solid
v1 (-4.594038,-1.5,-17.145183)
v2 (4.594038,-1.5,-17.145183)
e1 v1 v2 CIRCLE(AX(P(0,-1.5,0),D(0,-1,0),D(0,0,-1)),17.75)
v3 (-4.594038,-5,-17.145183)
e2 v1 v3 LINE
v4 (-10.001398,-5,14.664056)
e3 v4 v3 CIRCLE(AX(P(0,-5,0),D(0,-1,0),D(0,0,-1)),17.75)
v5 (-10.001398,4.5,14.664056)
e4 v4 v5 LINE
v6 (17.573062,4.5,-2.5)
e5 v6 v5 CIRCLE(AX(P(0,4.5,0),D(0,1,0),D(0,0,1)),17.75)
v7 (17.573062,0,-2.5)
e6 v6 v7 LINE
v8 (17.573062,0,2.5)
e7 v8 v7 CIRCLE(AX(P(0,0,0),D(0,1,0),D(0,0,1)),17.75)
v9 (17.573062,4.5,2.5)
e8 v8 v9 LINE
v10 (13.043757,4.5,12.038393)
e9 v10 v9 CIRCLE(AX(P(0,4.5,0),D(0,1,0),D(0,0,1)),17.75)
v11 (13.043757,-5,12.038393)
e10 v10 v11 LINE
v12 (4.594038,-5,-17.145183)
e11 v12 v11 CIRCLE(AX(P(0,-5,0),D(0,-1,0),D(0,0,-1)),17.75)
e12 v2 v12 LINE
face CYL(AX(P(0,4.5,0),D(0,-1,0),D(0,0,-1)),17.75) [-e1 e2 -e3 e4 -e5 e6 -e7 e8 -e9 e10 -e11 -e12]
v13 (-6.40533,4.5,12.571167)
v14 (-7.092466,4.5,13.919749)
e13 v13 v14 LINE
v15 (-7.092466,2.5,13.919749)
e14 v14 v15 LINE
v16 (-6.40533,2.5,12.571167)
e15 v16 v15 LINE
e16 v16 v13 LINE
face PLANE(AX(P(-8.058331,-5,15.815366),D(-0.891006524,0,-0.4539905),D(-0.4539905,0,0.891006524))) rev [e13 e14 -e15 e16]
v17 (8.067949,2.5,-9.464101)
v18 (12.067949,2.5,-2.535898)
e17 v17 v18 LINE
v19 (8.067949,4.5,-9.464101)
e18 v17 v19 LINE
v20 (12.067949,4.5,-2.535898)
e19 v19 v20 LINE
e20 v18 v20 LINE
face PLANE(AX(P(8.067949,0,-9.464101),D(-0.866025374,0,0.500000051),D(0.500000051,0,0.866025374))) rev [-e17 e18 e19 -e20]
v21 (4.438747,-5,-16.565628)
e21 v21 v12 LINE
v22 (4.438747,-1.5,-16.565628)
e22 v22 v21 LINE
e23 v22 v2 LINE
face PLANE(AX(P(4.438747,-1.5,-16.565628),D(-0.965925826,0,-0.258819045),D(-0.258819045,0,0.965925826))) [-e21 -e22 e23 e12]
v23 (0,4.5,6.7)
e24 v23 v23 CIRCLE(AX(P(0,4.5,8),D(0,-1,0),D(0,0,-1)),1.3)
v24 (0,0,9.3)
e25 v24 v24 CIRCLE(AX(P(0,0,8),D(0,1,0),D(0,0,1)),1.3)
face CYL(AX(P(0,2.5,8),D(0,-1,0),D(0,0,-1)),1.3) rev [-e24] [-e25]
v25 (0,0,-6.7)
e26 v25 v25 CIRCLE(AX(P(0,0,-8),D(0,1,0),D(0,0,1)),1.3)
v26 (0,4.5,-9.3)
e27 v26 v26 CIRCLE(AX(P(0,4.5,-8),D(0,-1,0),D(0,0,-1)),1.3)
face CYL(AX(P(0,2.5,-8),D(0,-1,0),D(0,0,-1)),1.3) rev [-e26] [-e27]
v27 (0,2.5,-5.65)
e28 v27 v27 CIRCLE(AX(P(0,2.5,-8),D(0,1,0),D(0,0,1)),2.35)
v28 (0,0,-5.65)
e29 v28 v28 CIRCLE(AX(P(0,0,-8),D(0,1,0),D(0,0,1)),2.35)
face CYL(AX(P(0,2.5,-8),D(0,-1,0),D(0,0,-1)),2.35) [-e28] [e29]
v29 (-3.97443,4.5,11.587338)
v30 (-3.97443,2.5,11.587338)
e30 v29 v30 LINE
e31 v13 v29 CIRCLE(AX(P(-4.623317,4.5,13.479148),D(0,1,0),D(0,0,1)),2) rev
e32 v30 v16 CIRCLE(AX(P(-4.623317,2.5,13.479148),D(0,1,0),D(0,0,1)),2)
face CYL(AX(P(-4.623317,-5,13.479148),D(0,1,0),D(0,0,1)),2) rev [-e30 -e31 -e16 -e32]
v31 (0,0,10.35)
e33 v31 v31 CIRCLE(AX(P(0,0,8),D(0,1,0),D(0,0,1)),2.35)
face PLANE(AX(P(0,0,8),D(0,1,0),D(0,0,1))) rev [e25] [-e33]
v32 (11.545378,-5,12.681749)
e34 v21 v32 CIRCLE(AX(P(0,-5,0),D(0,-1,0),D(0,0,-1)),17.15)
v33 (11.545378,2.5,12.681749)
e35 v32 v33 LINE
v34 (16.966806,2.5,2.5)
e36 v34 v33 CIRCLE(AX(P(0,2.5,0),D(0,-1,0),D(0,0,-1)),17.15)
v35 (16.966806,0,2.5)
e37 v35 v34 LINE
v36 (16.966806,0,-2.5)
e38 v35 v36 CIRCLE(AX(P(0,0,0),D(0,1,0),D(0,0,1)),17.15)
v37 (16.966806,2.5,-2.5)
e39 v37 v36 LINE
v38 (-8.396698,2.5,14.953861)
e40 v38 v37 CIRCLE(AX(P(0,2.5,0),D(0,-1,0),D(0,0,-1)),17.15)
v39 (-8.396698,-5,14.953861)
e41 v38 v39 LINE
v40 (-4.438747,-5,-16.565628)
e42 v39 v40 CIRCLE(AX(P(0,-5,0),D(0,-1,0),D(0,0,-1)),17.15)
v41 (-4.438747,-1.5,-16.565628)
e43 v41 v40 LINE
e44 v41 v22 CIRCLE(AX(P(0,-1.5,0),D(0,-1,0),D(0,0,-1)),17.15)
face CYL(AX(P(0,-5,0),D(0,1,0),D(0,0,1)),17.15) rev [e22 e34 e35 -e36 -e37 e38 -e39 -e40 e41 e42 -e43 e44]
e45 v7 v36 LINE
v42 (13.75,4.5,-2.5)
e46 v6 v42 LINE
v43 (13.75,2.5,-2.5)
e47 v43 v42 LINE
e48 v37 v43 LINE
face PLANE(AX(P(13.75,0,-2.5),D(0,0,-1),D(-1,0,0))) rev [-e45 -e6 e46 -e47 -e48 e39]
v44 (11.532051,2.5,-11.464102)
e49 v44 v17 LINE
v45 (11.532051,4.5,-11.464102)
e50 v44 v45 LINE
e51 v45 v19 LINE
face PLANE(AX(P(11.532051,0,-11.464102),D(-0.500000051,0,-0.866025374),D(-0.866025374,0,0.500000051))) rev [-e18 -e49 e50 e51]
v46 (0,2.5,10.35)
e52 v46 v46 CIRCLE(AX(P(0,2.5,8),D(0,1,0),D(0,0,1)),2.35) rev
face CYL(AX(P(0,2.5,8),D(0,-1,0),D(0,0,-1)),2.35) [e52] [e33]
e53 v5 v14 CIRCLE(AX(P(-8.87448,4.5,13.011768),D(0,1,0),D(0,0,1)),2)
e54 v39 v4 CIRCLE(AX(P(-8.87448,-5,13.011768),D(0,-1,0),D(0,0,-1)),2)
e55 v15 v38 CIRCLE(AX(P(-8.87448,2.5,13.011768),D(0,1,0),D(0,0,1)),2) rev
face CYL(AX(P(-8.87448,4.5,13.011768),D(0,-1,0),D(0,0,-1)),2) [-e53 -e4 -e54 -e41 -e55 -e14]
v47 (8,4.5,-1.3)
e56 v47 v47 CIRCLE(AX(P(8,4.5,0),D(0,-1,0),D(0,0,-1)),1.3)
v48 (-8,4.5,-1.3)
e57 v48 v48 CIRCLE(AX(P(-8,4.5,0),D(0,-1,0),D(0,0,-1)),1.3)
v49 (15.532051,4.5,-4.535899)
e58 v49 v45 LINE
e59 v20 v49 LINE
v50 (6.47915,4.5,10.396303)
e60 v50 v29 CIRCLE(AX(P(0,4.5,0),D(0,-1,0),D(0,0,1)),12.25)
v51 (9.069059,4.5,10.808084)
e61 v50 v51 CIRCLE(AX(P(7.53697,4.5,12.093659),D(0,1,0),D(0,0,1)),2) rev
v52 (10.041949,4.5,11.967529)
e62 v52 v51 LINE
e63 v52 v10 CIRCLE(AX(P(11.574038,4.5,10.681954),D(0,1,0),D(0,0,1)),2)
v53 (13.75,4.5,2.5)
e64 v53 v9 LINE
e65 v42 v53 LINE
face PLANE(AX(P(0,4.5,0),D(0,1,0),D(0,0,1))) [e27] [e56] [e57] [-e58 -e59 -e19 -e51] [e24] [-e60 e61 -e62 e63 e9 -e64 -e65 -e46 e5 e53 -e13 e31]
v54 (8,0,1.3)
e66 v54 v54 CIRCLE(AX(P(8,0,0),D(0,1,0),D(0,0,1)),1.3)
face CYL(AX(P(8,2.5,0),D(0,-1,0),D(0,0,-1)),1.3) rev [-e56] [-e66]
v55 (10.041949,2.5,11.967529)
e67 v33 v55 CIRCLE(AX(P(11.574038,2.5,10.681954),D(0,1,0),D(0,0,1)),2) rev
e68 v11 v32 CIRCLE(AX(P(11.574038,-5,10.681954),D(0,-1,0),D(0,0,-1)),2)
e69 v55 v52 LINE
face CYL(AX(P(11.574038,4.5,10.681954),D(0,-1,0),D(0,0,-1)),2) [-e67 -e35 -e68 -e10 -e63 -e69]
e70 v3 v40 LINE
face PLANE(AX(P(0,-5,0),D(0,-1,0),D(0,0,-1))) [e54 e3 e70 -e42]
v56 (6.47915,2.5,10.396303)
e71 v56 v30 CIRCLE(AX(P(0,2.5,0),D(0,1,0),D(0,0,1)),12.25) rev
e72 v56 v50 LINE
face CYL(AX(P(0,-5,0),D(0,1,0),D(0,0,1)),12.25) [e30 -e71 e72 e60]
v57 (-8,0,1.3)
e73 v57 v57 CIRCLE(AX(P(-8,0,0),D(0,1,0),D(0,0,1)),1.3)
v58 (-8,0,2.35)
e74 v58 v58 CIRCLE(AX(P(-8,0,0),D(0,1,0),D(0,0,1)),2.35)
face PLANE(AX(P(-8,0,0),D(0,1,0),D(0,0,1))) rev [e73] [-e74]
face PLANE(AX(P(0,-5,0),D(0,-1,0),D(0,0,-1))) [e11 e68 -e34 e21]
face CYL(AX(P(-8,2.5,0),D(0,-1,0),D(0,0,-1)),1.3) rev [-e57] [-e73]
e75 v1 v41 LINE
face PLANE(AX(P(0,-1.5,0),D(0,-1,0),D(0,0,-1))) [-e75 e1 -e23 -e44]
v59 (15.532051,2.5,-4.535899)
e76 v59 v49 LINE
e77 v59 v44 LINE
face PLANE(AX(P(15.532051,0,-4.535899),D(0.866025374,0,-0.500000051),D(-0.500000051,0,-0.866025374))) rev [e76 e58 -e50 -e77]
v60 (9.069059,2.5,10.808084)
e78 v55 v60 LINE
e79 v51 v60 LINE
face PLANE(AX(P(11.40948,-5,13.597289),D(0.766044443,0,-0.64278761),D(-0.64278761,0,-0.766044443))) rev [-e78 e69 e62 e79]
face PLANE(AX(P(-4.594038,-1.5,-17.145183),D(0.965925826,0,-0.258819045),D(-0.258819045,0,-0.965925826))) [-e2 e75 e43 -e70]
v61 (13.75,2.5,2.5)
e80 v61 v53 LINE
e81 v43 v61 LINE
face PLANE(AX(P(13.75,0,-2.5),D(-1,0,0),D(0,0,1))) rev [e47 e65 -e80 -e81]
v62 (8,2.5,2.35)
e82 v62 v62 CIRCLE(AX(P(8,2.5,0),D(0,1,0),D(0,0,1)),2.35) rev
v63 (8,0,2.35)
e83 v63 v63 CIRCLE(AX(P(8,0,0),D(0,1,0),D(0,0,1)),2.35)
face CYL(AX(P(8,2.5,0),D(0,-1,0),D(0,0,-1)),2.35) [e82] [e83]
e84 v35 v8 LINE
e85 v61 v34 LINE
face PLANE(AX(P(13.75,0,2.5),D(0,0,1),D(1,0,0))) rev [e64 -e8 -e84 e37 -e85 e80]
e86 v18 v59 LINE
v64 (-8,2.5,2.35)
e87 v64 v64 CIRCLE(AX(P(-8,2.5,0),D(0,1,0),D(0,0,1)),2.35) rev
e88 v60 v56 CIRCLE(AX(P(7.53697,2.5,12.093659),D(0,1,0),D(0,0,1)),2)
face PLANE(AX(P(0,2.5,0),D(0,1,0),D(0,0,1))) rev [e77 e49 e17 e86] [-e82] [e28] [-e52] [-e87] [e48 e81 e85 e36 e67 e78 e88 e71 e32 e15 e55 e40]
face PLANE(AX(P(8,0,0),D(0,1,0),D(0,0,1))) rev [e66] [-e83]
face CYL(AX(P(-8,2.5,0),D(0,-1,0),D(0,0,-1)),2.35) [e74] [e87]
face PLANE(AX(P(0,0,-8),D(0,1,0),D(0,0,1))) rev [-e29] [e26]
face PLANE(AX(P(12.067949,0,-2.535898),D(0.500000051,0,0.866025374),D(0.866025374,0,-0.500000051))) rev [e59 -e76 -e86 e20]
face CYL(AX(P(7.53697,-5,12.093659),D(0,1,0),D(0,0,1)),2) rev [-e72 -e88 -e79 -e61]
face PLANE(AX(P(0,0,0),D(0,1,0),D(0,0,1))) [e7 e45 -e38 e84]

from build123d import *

# Parameters (mm, degrees)
SKETCH_1_R               = 2.35
SKETCH_1_R_2             = 1.3
EXTRUDE_1_DEPTH          = 2.5
EXTRUDE_1_2_DEPTH        = 2.5
EXTRUDE_1_3_DEPTH        = 2.5
EXTRUDE_1_4_DEPTH        = 2.5
SKETCH_2_R               = 17.75
EXTRUDE_2_DEPTH          = 2
SKETCH_3_R               = 1.3
CUT_EXTRUDE_1_DEPTH      = 26.226474189
CUT_EXTRUDE_2_DEPTH      = 26.502450863
CUT_EXTRUDE_2_DEPTH_BACK = 26.502450863
EXTRUDE_START            = 7.5
SKETCH_5_R               = 17.75
SKETCH_5_R_2             = 17.15
EXTRUDE_3_DEPTH          = 7.5
SKETCH_6_W               = 4
SKETCH_6_H               = 5
CUT_EXTRUDE_3_DEPTH      = 4.5
CUT_EXTRUDE_4_DEPTH      = 27.839802533
CUT_EXTRUDE_5_DEPTH      = 3.5
FILLET_1_R               = 2


with BuildPart() as part:
    # 草图1 → 凸台-拉伸1 (new body)
    with BuildSketch(Plane(origin=(0, 0, 0), x_dir=(1, 0, 0), z_dir=(0, 1, 0))):
        with Locations((0, 8)):
            Circle(SKETCH_1_R)
        with Locations((0, 8)):
            Circle(SKETCH_1_R_2, mode=Mode.SUBTRACT)
    extrude(amount=EXTRUDE_1_DEPTH)



with BuildPart() as body_2:
    # 草图1 → Extrude 1 2 (new body)
    with BuildSketch(Plane(origin=(0, 0, 0), x_dir=(1, 0, 0), z_dir=(0, 1, 0))):
        with Locations((8, 0)):
            Circle(SKETCH_1_R)
        with Locations((8, 0)):
            Circle(SKETCH_1_R_2, mode=Mode.SUBTRACT)
    extrude(amount=EXTRUDE_1_2_DEPTH)


with BuildPart() as body_3:
    # 草图1 → Extrude 1 3 (new body)
    with BuildSketch(Plane(origin=(0, 0, 0), x_dir=(1, 0, 0), z_dir=(0, 1, 0))):
        with Locations((0, -8)):
            Circle(SKETCH_1_R)
        with Locations((0, -8)):
            Circle(SKETCH_1_R_2, mode=Mode.SUBTRACT)
    extrude(amount=EXTRUDE_1_3_DEPTH)


with BuildPart() as body_4:
    # 草图1 → Extrude 1 4 (new body)
    with BuildSketch(Plane(origin=(0, 0, 0), x_dir=(1, 0, 0), z_dir=(0, 1, 0))):
        with Locations((-8, 0)):
            Circle(SKETCH_1_R)
        with Locations((-8, 0)):
            Circle(SKETCH_1_R_2, mode=Mode.SUBTRACT)
    extrude(amount=EXTRUDE_1_4_DEPTH)


with BuildPart() as part_1:
    add(part.part)

    add(body_2.part)  # 凸台-拉伸2 merges body 2

    add(body_3.part)  # 凸台-拉伸2 merges body 3

    add(body_4.part)  # 凸台-拉伸2 merges body 4
    # 草图2 → 凸台-拉伸2 (add)
    with BuildSketch(Plane(origin=(0, 2.5, 0), x_dir=(1, 0, 0), z_dir=(0, 1, 0))):
        Circle(SKETCH_2_R)
    extrude(amount=EXTRUDE_2_DEPTH)

    # 草图3 → 切除-拉伸1 (cut, through all)
    with BuildSketch(Plane.XZ.offset(-2.5)):
        with Locations((0, -8)):
            Circle(SKETCH_3_R)
        with Locations((8, 0)):
            Circle(SKETCH_3_R)
        with Locations((0, 8)):
            Circle(SKETCH_3_R)
        with Locations((-8, 0)):
            Circle(SKETCH_3_R)
    extrude(amount=-CUT_EXTRUDE_1_DEPTH, mode=Mode.SUBTRACT)

    # 草图4 → 切除-拉伸2 (cut, two sides: drawn at the far end of the back side and taken through both)
    with BuildSketch(Plane(origin=(0, 4.5, 0), x_dir=(1, 0, 0), z_dir=(0, 1, 0)).offset(-CUT_EXTRUDE_2_DEPTH_BACK)):
        Polygon((8.067949046, 9.464101393), (12.067949458, 2.535898401), (15.532050954, 4.535898607), (11.532050542, 11.464101599), align=None)
    extrude(amount=CUT_EXTRUDE_2_DEPTH + CUT_EXTRUDE_2_DEPTH_BACK, mode=Mode.SUBTRACT)

    # 草图5 → 凸台-拉伸3 (add)
    with BuildSketch(Plane.XZ.offset(-2.5).offset(EXTRUDE_START)):
        Circle(SKETCH_5_R)
        Circle(SKETCH_5_R_2, mode=Mode.SUBTRACT)
    extrude(amount=-EXTRUDE_3_DEPTH)

    # 草图6 → 切除-拉伸3 (cut)
    with BuildSketch(Plane(origin=(0, 4.5, 0), x_dir=(1, 0, 0), z_dir=(0, 1, 0))):
        with Locations((15.75, 0)):
            Rectangle(SKETCH_6_W, SKETCH_6_H)
    extrude(amount=-CUT_EXTRUDE_3_DEPTH, mode=Mode.SUBTRACT)

    # 草图7 → 切除-拉伸4 (cut, through all)
    with BuildSketch(Plane(origin=(0, 4.5, 0), x_dir=(1, 0, 0), z_dir=(0, 1, 0))):
        with BuildLine():
            Line((11.409480072, -13.597288865), (7.874148219, -9.384044428))
            ThreePointArc((7.874148219, -9.384044428), (1.386739369, -12.171255232), (-5.561383622, -10.914829921))
            Line((-5.561383622, -10.914829921), (-8.05833137, -15.815365804))
            ThreePointArc((-8.05833137, -15.815365804), (2.009357044, -17.635900438), (11.409480072, -13.597288865))
        make_face()
    extrude(amount=-CUT_EXTRUDE_4_DEPTH, mode=Mode.SUBTRACT)

    # 草图8 → 切除-拉伸5 (cut)
    with BuildSketch(Plane.XZ.offset(5)):
        with BuildLine():
            Line((-4.594038051, -17.145183417), (-4.438746624, -16.565627921))
            ThreePointArc((-4.438746624, -16.565627921), (0, -17.15), (4.438746624, -16.565627921))
            Line((4.438746624, -16.565627921), (4.594038051, -17.145183417))
            ThreePointArc((4.594038051, -17.145183417), (0, -17.75), (-4.594038051, -17.145183417))
        make_face()
    extrude(amount=-CUT_EXTRUDE_5_DEPTH, mode=Mode.SUBTRACT)

    # 圆角1
    fillet_1_edges = [part_1.edges().sort_by_distance(p)[0] for p in [
        (-5.561383622, 3.5, 10.914829921),
        (7.874148219, 3.5, 9.384044428),
    ]]
    fillet(fillet_1_edges, radius=FILLET_1_R)
    fillet_1_2_edges = [part_1.edges().sort_by_distance(p)[0] for p in [
        (-8.05833137, -0.25, 15.815365804),
        (11.409480072, -0.25, 13.597288865),
    ]]
    fillet(fillet_1_2_edges, radius=FILLET_1_R)


solid = part_1.part
